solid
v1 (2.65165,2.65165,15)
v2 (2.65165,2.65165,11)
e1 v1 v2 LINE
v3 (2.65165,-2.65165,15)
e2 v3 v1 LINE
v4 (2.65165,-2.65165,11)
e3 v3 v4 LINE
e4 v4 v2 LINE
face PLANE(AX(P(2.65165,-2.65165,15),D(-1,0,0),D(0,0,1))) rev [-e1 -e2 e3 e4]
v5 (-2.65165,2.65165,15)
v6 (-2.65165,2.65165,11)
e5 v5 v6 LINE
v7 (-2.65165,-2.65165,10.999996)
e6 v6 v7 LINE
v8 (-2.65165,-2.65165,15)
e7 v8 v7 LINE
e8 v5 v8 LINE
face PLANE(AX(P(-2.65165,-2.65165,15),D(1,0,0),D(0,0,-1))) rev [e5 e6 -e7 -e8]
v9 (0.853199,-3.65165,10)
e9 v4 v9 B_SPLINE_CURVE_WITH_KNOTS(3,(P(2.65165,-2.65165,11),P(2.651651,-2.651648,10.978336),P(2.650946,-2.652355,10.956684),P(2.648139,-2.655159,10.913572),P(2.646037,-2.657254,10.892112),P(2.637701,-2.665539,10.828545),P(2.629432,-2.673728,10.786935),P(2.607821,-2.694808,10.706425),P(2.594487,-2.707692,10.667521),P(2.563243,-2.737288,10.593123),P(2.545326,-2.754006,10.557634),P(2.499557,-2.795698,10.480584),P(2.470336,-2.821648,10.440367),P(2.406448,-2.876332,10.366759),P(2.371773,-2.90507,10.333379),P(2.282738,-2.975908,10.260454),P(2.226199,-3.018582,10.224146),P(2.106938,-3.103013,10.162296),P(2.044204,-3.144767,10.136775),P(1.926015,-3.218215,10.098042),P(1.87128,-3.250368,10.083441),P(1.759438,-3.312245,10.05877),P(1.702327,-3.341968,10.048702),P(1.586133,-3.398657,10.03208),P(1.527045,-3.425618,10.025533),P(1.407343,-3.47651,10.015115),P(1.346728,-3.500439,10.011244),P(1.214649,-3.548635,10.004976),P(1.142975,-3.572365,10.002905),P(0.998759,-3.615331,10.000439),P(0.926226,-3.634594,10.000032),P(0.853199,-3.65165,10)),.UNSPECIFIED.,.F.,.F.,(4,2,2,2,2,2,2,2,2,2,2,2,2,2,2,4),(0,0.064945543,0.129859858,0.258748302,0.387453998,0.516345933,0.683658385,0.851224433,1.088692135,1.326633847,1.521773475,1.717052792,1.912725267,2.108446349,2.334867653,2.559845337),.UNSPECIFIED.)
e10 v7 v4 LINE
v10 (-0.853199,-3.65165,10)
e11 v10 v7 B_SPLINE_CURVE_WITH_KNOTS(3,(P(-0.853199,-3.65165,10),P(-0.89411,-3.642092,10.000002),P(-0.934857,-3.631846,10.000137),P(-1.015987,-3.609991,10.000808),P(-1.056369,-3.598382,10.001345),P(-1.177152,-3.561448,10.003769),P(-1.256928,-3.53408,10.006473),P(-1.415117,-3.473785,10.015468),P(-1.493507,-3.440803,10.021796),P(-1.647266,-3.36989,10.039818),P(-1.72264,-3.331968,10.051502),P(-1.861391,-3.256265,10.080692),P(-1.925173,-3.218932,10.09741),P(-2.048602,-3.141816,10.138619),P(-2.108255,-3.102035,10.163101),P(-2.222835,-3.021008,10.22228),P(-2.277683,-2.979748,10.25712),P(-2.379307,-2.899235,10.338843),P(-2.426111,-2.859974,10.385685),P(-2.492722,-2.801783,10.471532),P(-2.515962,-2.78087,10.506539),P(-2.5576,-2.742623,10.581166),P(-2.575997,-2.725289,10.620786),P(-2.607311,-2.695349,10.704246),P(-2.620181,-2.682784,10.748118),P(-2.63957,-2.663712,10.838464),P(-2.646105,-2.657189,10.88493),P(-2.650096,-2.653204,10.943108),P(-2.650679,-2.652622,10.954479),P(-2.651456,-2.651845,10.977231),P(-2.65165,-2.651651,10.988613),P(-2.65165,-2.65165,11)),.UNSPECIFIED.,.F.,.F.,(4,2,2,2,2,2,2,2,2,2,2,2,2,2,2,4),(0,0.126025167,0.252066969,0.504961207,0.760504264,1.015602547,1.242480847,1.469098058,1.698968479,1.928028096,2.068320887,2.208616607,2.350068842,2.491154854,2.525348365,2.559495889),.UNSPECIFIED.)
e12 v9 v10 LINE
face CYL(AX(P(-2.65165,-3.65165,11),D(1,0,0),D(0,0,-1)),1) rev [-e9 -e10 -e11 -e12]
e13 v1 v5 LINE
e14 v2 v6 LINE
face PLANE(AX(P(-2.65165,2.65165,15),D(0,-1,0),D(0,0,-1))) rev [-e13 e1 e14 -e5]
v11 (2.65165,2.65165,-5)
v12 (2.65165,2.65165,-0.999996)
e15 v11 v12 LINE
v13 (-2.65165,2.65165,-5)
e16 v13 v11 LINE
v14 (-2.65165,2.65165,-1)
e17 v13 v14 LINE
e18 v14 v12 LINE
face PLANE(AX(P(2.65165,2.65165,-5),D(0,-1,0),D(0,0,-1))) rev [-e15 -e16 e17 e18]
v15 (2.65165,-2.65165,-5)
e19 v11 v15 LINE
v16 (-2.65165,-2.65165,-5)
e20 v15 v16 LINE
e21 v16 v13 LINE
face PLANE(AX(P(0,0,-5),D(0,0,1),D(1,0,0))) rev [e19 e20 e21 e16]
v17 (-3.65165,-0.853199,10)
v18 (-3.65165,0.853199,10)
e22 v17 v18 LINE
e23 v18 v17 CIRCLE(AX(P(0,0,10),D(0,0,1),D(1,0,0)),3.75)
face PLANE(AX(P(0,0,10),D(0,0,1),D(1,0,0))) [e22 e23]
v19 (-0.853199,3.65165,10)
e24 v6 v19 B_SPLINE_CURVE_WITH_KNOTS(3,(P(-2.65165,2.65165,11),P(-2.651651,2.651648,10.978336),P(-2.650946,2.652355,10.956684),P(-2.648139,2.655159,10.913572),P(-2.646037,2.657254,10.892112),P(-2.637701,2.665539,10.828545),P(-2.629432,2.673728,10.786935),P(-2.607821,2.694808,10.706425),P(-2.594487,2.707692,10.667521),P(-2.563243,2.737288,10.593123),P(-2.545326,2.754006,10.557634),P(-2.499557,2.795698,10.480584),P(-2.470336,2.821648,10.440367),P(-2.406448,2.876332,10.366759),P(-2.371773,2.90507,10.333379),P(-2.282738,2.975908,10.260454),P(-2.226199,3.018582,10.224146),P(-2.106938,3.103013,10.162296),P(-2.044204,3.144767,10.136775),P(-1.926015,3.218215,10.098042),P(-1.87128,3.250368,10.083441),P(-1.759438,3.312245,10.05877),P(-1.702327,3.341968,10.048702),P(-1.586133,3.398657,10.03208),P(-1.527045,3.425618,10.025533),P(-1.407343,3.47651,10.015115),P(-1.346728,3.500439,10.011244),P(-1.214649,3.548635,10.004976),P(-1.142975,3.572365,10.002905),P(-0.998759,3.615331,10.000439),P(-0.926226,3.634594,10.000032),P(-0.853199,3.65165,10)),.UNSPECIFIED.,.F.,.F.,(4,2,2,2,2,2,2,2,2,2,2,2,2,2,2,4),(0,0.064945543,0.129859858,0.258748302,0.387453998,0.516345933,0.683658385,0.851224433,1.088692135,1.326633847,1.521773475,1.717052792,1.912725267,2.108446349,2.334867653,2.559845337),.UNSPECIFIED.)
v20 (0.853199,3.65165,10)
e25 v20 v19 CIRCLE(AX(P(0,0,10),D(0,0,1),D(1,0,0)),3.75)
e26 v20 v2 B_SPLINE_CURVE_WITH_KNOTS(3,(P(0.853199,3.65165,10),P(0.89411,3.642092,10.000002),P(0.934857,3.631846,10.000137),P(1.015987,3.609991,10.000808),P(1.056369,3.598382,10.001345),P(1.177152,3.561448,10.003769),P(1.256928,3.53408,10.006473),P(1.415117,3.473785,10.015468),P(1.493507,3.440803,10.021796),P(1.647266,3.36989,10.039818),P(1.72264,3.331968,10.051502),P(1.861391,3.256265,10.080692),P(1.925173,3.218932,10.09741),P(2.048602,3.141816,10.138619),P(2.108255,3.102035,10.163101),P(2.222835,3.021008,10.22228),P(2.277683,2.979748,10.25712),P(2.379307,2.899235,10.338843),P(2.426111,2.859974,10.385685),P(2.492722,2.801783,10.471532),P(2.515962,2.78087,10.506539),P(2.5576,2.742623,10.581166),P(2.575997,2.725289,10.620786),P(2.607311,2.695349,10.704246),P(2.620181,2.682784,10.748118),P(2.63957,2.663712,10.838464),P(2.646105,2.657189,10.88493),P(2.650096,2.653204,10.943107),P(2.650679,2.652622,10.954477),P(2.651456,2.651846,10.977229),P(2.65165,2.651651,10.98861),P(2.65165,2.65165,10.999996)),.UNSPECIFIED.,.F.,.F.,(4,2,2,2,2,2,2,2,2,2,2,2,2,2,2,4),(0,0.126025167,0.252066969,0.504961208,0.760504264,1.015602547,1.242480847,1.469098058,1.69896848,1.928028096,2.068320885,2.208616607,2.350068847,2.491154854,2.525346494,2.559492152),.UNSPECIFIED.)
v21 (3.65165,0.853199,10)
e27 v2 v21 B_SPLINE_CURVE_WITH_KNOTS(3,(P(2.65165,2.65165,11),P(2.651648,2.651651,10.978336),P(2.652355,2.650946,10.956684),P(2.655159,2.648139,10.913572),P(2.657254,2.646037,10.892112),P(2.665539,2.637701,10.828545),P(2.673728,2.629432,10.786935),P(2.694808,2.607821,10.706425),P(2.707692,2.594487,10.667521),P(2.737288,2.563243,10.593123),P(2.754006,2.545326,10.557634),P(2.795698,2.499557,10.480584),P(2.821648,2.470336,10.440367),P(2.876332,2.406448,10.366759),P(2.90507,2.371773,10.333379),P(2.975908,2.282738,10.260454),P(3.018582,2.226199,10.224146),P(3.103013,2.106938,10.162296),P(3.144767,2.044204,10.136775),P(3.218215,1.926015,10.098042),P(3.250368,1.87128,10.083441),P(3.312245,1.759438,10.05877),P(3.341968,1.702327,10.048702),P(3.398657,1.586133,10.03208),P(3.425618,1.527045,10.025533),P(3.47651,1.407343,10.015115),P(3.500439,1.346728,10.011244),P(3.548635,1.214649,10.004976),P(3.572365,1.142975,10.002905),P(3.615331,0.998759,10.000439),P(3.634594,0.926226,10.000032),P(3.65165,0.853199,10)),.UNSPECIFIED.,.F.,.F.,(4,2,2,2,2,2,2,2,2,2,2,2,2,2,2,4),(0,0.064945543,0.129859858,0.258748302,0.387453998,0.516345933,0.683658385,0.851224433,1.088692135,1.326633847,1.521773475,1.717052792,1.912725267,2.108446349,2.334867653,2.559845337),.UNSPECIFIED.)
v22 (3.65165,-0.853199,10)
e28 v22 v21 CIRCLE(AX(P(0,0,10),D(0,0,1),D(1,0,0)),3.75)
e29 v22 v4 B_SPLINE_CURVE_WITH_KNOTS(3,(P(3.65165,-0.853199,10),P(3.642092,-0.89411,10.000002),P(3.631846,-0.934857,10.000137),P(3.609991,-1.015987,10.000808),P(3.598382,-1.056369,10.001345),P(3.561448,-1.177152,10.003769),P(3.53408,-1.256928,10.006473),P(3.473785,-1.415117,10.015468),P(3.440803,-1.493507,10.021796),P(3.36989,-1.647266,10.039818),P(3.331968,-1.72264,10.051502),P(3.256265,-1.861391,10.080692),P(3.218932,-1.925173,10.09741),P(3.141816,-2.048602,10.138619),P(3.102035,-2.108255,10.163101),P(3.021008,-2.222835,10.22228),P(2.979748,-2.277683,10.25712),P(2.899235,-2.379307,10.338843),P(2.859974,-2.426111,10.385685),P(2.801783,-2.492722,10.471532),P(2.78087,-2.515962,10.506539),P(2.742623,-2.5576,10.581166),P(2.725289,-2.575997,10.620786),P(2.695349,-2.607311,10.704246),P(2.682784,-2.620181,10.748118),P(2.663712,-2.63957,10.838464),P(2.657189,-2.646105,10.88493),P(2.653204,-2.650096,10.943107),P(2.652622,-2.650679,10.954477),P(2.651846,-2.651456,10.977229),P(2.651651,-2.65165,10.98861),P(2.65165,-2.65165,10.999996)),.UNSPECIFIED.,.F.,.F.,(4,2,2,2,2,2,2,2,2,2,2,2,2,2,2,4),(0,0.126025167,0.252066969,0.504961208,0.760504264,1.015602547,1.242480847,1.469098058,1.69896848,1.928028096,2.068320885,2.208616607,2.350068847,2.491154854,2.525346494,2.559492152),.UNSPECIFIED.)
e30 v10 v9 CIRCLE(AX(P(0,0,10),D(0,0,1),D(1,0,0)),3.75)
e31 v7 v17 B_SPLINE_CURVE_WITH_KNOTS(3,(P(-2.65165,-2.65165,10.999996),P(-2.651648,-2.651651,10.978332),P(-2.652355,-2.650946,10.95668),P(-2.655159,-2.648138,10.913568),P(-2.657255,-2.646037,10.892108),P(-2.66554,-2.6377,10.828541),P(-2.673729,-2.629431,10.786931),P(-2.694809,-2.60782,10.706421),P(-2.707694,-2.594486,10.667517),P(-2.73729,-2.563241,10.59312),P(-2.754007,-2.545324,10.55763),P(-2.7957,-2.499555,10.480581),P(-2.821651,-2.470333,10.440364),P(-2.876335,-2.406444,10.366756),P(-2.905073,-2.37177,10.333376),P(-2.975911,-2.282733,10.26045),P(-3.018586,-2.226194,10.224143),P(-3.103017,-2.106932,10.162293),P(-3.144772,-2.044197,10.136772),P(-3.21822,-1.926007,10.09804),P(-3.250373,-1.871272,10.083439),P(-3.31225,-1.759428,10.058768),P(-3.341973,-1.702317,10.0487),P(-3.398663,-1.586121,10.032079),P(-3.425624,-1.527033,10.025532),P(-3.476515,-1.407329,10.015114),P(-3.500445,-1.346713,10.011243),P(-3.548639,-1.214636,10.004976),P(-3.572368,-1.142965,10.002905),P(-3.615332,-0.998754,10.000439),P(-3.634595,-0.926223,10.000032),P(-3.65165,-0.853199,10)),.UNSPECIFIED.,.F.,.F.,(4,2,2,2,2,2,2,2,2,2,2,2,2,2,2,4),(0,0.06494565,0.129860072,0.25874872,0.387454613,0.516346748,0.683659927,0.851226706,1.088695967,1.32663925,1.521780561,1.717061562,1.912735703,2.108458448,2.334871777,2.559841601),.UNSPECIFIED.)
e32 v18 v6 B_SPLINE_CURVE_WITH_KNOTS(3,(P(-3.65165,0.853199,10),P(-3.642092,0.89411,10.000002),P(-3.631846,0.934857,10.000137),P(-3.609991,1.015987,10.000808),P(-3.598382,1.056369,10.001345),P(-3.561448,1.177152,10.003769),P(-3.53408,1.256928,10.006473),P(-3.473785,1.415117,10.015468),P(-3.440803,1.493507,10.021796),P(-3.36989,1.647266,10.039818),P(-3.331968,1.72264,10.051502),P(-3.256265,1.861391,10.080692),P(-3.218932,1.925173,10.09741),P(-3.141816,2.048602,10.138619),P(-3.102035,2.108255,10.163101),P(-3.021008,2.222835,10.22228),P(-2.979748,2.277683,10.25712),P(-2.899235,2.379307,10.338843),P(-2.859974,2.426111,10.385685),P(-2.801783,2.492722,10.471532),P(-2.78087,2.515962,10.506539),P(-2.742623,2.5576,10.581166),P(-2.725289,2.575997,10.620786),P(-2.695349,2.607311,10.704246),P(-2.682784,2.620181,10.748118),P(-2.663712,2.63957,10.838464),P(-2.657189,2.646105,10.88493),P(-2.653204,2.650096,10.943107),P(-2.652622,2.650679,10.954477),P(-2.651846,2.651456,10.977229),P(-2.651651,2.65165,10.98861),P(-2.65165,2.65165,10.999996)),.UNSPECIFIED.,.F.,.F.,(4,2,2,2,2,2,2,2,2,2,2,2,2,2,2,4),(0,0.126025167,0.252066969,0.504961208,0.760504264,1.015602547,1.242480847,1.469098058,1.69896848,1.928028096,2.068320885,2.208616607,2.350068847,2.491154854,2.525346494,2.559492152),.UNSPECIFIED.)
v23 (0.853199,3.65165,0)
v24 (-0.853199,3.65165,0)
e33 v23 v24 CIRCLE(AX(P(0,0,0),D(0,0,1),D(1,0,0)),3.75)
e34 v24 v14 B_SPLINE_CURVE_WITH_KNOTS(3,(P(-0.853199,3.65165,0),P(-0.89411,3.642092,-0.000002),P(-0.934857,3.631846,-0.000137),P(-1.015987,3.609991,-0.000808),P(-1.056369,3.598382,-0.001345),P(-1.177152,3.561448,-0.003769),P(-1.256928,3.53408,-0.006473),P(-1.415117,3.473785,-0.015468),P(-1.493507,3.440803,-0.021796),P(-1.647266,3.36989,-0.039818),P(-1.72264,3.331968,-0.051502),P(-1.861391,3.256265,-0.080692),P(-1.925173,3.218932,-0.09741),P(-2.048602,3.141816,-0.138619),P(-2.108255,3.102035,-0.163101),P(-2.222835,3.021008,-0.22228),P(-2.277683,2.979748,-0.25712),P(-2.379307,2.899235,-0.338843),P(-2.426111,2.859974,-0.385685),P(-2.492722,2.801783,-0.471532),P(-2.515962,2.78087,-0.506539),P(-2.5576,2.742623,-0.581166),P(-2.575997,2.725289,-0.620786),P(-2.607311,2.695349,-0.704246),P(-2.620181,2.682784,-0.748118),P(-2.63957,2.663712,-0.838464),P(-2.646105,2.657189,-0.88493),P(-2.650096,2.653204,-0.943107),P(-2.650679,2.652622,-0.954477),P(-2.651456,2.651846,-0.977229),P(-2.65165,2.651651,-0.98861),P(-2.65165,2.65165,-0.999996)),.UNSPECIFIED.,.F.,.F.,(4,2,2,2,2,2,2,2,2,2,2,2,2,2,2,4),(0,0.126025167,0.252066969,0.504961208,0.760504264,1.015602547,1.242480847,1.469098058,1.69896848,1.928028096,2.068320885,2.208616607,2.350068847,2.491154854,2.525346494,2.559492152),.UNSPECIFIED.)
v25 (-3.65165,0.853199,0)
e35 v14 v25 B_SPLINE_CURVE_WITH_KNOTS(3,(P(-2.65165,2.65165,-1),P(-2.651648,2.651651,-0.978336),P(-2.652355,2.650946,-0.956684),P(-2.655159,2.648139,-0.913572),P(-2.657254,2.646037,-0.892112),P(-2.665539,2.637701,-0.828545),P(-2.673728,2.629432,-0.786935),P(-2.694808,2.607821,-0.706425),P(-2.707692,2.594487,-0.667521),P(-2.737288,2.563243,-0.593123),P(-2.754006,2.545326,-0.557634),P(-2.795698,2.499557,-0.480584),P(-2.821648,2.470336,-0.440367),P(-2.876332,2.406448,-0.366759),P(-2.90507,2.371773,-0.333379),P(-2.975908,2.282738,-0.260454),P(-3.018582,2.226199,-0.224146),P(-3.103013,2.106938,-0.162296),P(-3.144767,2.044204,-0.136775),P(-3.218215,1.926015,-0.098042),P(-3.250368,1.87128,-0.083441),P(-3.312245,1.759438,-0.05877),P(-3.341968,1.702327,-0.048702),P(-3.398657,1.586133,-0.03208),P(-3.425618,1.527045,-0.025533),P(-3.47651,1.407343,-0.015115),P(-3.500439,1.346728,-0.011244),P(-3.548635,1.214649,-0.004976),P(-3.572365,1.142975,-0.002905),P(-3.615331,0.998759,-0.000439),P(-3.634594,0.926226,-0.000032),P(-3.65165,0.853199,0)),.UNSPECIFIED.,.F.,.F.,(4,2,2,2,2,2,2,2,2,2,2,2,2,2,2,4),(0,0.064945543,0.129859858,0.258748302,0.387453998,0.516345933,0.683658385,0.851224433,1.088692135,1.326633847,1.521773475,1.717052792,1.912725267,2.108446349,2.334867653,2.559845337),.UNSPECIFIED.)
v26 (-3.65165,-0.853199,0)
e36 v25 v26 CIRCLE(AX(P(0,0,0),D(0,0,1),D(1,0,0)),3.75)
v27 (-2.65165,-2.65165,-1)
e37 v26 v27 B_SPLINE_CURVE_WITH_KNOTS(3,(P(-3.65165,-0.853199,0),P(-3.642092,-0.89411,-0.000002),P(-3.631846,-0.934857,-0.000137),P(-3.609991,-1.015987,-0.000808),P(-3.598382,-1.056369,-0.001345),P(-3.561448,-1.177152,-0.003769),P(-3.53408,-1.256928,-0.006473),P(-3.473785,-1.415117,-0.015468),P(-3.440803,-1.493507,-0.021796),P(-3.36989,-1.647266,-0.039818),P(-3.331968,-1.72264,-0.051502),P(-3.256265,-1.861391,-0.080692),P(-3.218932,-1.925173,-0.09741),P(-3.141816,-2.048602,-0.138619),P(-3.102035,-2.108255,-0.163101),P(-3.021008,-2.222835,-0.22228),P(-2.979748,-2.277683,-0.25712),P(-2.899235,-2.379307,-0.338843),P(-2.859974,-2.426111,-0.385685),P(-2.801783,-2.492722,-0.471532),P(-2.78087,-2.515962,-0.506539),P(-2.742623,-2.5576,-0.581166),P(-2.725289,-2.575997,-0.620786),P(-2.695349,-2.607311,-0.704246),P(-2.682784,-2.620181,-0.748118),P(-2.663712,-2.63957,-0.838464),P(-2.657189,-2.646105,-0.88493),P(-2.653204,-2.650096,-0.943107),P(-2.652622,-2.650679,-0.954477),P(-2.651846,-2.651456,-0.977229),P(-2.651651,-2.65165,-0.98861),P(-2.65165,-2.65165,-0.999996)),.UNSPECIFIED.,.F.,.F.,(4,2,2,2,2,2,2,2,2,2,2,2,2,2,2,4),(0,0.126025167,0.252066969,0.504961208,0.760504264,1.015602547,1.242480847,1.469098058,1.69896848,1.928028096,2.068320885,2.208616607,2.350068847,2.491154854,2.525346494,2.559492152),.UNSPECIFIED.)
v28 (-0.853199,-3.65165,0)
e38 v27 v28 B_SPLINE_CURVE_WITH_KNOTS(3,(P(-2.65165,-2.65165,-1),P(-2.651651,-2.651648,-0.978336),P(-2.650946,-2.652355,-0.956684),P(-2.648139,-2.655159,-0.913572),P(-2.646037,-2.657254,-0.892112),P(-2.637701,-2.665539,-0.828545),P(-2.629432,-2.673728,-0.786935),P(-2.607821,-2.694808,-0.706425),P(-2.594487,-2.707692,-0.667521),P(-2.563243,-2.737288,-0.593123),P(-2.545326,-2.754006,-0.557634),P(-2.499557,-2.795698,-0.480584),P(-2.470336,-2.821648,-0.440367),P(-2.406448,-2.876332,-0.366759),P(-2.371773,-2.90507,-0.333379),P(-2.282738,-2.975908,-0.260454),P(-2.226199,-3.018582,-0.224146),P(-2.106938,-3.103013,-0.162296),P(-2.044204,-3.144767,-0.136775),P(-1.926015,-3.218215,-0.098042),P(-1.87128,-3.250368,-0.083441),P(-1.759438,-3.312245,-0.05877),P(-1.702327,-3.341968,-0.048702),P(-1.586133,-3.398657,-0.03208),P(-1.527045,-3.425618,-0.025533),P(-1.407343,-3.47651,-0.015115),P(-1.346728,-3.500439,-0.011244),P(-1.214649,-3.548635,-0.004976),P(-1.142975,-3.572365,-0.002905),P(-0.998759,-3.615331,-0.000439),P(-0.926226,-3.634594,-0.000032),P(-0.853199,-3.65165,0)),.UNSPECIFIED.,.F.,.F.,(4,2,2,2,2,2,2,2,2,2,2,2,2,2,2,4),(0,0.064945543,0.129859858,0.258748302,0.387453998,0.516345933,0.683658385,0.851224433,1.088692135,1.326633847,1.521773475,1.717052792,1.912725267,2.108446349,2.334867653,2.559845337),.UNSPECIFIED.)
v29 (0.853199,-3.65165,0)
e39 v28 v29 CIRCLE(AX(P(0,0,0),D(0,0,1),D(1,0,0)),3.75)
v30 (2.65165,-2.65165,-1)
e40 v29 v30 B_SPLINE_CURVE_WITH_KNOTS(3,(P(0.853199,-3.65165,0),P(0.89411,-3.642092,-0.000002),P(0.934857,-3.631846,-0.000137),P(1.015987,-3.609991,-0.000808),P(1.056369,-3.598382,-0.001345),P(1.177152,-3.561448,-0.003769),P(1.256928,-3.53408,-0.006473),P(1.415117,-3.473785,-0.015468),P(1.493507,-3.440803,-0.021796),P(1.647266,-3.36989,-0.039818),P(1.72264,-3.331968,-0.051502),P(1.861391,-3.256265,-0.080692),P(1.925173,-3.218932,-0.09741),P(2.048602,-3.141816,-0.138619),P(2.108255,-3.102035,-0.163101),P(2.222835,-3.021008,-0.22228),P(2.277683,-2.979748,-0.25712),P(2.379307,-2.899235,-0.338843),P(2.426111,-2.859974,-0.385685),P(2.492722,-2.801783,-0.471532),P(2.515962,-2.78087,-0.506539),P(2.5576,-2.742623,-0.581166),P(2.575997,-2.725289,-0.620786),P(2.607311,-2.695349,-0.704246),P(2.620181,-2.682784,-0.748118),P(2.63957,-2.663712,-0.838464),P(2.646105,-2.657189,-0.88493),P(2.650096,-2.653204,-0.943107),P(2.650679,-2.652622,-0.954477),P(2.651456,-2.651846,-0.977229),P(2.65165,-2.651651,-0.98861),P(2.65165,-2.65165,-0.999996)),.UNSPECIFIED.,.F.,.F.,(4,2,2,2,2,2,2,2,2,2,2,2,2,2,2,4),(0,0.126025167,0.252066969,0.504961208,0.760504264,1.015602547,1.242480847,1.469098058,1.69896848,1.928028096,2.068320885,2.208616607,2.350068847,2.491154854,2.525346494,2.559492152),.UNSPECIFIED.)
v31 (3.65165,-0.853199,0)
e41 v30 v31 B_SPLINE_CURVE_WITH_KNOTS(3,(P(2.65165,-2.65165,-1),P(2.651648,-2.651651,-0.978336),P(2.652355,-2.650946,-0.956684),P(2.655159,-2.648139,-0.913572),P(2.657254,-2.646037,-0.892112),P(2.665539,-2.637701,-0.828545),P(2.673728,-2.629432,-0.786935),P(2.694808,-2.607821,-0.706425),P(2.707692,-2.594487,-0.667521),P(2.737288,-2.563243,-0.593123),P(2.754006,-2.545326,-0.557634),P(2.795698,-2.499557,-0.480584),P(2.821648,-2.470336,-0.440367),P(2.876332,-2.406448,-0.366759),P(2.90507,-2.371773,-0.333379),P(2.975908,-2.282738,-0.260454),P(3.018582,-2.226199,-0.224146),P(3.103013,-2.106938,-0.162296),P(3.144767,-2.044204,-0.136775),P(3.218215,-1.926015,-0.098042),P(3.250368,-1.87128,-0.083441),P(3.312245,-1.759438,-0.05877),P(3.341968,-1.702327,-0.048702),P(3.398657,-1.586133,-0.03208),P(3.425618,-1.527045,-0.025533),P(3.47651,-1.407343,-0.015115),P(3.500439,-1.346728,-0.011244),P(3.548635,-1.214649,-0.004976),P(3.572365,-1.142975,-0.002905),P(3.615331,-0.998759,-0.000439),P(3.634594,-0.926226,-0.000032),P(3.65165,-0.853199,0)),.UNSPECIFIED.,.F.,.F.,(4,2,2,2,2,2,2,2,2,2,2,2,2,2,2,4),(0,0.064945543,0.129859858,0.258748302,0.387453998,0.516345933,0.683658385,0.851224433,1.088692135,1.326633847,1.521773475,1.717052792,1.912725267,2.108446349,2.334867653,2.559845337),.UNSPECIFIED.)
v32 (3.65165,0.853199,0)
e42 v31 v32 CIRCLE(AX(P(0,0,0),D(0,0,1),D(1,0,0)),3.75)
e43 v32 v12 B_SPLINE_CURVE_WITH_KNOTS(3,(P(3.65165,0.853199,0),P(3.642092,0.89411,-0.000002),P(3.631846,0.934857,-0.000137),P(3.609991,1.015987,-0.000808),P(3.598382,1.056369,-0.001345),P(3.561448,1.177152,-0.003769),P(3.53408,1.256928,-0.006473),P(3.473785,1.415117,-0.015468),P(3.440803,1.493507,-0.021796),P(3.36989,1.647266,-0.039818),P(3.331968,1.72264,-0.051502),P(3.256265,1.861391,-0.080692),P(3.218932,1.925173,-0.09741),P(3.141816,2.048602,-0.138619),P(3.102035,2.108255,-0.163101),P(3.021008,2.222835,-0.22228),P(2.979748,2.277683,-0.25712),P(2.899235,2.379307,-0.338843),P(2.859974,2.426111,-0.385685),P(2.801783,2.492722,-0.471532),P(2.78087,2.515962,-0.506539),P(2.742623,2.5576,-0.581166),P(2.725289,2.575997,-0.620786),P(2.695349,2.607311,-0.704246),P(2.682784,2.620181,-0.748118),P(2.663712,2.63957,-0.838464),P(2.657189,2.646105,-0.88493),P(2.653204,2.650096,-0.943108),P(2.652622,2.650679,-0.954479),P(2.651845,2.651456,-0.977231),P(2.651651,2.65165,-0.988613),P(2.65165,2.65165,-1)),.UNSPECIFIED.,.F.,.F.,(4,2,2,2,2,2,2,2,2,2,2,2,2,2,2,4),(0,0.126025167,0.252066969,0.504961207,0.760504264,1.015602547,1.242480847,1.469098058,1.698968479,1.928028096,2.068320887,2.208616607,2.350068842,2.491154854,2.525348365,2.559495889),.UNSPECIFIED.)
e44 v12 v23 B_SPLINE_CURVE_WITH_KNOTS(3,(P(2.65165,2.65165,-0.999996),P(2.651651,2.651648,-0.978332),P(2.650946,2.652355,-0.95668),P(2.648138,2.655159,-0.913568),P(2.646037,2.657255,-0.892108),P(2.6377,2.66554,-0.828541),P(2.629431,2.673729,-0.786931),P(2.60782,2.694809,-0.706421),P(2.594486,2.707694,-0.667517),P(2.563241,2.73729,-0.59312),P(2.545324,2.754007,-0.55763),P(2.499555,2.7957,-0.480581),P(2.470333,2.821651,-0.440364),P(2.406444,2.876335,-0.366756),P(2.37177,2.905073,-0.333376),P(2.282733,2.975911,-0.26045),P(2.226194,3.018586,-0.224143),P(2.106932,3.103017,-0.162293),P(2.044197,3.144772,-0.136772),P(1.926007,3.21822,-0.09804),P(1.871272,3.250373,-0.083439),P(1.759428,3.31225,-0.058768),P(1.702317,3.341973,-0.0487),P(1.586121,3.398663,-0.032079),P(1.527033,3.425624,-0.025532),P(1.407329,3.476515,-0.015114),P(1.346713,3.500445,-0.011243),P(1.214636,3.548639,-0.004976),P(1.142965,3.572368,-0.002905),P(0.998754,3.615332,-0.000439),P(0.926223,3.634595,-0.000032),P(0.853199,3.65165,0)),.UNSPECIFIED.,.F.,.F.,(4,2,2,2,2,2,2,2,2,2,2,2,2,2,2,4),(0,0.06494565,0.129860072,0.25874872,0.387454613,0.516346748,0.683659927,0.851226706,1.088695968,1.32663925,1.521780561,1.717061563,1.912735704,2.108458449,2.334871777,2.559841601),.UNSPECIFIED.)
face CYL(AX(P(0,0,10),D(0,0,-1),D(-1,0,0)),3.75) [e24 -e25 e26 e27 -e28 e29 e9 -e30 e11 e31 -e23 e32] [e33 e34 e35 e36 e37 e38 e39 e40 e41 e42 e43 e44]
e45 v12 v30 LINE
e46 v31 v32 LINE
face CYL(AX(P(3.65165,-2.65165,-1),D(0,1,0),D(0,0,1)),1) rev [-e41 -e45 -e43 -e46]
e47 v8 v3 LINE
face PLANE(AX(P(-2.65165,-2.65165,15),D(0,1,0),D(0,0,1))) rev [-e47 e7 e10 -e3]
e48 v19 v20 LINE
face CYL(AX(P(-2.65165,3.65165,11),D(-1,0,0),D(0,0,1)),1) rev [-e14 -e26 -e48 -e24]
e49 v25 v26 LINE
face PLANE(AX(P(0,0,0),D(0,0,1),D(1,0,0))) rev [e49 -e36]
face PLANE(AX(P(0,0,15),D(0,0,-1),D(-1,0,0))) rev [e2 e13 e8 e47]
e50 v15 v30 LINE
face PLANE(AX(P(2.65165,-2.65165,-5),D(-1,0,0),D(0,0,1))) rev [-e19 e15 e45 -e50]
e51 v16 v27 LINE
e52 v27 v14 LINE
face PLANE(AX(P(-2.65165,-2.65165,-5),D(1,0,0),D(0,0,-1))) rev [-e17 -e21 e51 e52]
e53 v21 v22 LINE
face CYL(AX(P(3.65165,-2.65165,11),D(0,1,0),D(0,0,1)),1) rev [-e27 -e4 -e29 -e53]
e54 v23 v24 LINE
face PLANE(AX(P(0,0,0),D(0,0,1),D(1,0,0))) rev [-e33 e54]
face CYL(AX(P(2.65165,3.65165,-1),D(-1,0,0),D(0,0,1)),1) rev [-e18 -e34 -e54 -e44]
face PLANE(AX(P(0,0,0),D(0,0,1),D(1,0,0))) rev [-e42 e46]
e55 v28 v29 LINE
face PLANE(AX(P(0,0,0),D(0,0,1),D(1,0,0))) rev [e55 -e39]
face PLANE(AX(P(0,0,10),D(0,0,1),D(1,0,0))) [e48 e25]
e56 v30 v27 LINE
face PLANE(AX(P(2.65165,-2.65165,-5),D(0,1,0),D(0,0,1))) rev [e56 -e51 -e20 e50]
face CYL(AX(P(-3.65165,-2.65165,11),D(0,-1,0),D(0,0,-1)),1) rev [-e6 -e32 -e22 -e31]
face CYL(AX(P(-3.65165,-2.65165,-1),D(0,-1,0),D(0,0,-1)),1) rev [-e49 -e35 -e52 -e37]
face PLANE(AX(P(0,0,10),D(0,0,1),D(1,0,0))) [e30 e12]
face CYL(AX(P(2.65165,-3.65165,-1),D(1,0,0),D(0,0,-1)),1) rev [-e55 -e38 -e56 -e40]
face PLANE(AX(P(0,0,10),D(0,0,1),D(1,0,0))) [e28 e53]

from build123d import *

# Parameters (mm, degrees)
SKETCH2_R           = 3.75
BOSS_EXTRUDE1_DEPTH = 10
SKETCH3_W           = 5.303300858
SKETCH3_H           = 5.303300858
BOSS_EXTRUDE2_DEPTH = 5
SKETCH4_W           = 5.303300858
SKETCH4_H           = 5.303300858
BOSS_EXTRUDE3_DEPTH = 5
FILLET1_R           = 1
FILLET3_R           = 1
FILLET4_R           = 1
FILLET5_R           = 1
FILLET6_R           = 1
FILLET7_R           = 1
FILLET8_R           = 1
FILLET9_R           = 1


with BuildPart() as part:
    # Sketch2 → Boss-Extrude1 (new body)
    with BuildSketch(Plane.XY):
        Circle(SKETCH2_R)
    extrude(amount=BOSS_EXTRUDE1_DEPTH)

    # Sketch3 → Boss-Extrude2 (add)
    with BuildSketch(Plane.XY.offset(10)):
        Rectangle(SKETCH3_W, SKETCH3_H)
    extrude(amount=BOSS_EXTRUDE2_DEPTH)

    # Sketch4 → Boss-Extrude3 (add)
    with BuildSketch(Plane(origin=(0, 0, 0), x_dir=(-1, 0, 0), z_dir=(0, 0, -1))):
        Rectangle(SKETCH4_W, SKETCH4_H)
    extrude(amount=BOSS_EXTRUDE3_DEPTH)

    # Fillet1
    # the kernel refuses this fillet: 1 mm, written as the material it adds along each edge
    with BuildSketch(Plane(origin=(-2.651650429, 2.651650429, 10), x_dir=(-1, 0, 0), z_dir=(0, -1, 0))) as fillet1_piece_1_section:
        with BuildLine():
            CenterArc((FILLET1_R, -FILLET1_R), FILLET1_R, 90, 90)
            Line((0, -FILLET1_R), (0, 0))
            Line((0, 0), (FILLET1_R, 0))
        make_face()
    fillet1_piece_1 = extrude(amount=5.303300859, mode=Mode.PRIVATE)
    fillet1_piece_1 = fillet1_piece_1 & Plane(origin=(0, 0, 10.241590104), x_dir=(1, 0, 0), z_dir=(0, 0, -1)) * Cylinder(3.75, 15, mode=Mode.PRIVATE)
    add(fillet1_piece_1)

    # Fillet3
    # the kernel refuses this fillet: 1 mm, written as the material it adds along each edge
    with BuildSketch(Plane(origin=(2.651650429, 2.651650429, 10), x_dir=(0, 0, 1), z_dir=(-1, 0, 0))) as fillet3_piece_1_section:
        with BuildLine():
            CenterArc((FILLET3_R, FILLET3_R), FILLET3_R, 180, 90)
            Line((0, FILLET3_R), (0, 0))
            Line((0, 0), (FILLET3_R, 0))
        make_face()
    fillet3_piece_1 = extrude(amount=7.803300859, mode=Mode.PRIVATE)
    fillet3_piece_1 = fillet3_piece_1 & Plane(origin=(0, 0, 10.24158994), x_dir=(1, 0, 0), z_dir=(0, 0, -1)) * Cylinder(3.75, 20, mode=Mode.PRIVATE)
    add(fillet3_piece_1)

    # Fillet4
    # the kernel refuses this fillet: 1 mm, written as the material it adds along each edge
    with BuildSketch(Plane(origin=(2.651650429, -2.651650429, 10), x_dir=(0, 0, 1), z_dir=(0, 1, 0))) as fillet4_piece_1_section:
        with BuildLine():
            CenterArc((FILLET4_R, FILLET4_R), FILLET4_R, 180, 90)
            Line((0, FILLET4_R), (0, 0))
            Line((0, 0), (FILLET4_R, 0))
        make_face()
    fillet4_piece_1 = extrude(amount=7.803300859, mode=Mode.PRIVATE)
    fillet4_piece_1 = fillet4_piece_1 & Plane(origin=(0, 0, 10.24158994), x_dir=(1, 0, 0), z_dir=(0, 0, -1)) * Cylinder(3.75, 20, mode=Mode.PRIVATE)
    add(fillet4_piece_1)

    # Fillet5
    fillet5_edges = [part.edges().sort_by_distance(p)[0] for p in [
        (0, -2.651650429, 10),
    ]]
    fillet(fillet5_edges, radius=FILLET5_R)

    # Fillet6
    # the kernel refuses this fillet: 1 mm, written as the material it adds along each edge
    with BuildSketch(Plane(origin=(-2.651650429, 2.651650429, 0), x_dir=(0, 1, 0), z_dir=(1, 0, 0))) as fillet6_piece_1_section:
        with BuildLine():
            CenterArc((FILLET6_R, -FILLET6_R), FILLET6_R, 90, 90)
            Line((0, -FILLET6_R), (0, 0))
            Line((0, 0), (FILLET6_R, 0))
        make_face()
    fillet6_piece_1 = extrude(amount=5.303300859, mode=Mode.PRIVATE)
    fillet6_piece_1 = fillet6_piece_1 & Plane(origin=(0, 0, -0.241590055), x_dir=(1, 0, 0), z_dir=(0, 0, -1)) * Cylinder(3.75, 15, mode=Mode.PRIVATE)
    add(fillet6_piece_1)

    # Fillet7
    # the kernel refuses this fillet: 1 mm, written as the material it adds along each edge
    with BuildSketch(Plane(origin=(-2.651650429, -2.651650429, 0), x_dir=(0, 0, -1), z_dir=(0, 1, 0))) as fillet7_piece_1_section:
        with BuildLine():
            CenterArc((FILLET7_R, FILLET7_R), FILLET7_R, 180, 90)
            Line((0, FILLET7_R), (0, 0))
            Line((0, 0), (FILLET7_R, 0))
        make_face()
    fillet7_piece_1 = extrude(amount=7.803300859, mode=Mode.PRIVATE)
    fillet7_piece_1 = fillet7_piece_1 & Plane(origin=(0, 0, -0.241590003), x_dir=(1, 0, 0), z_dir=(0, 0, -1)) * Cylinder(3.75, 20, mode=Mode.PRIVATE)
    add(fillet7_piece_1)

    # Fillet8
    # the kernel refuses this fillet: 1 mm, written as the material it adds along each edge
    with BuildSketch(Plane(origin=(2.651650429, -2.651650429, 0), x_dir=(0, 0, -1), z_dir=(-1, 0, 0))) as fillet8_piece_1_section:
        with BuildLine():
            CenterArc((FILLET8_R, FILLET8_R), FILLET8_R, 180, 90)
            Line((0, FILLET8_R), (0, 0))
            Line((0, 0), (FILLET8_R, 0))
        make_face()
    fillet8_piece_1 = extrude(amount=7.803300859, mode=Mode.PRIVATE)
    fillet8_piece_1 = fillet8_piece_1 & Plane(origin=(0, 0, -0.241589985), x_dir=(1, 0, 0), z_dir=(0, 0, -1)) * Cylinder(3.75, 20, mode=Mode.PRIVATE)
    add(fillet8_piece_1)

    # Fillet9
    fillet9_edges = [part.edges().sort_by_distance(p)[0] for p in [
        (2.651650429, 0, 0),
    ]]
    fillet(fillet9_edges, radius=FILLET9_R)


solid = part.part
